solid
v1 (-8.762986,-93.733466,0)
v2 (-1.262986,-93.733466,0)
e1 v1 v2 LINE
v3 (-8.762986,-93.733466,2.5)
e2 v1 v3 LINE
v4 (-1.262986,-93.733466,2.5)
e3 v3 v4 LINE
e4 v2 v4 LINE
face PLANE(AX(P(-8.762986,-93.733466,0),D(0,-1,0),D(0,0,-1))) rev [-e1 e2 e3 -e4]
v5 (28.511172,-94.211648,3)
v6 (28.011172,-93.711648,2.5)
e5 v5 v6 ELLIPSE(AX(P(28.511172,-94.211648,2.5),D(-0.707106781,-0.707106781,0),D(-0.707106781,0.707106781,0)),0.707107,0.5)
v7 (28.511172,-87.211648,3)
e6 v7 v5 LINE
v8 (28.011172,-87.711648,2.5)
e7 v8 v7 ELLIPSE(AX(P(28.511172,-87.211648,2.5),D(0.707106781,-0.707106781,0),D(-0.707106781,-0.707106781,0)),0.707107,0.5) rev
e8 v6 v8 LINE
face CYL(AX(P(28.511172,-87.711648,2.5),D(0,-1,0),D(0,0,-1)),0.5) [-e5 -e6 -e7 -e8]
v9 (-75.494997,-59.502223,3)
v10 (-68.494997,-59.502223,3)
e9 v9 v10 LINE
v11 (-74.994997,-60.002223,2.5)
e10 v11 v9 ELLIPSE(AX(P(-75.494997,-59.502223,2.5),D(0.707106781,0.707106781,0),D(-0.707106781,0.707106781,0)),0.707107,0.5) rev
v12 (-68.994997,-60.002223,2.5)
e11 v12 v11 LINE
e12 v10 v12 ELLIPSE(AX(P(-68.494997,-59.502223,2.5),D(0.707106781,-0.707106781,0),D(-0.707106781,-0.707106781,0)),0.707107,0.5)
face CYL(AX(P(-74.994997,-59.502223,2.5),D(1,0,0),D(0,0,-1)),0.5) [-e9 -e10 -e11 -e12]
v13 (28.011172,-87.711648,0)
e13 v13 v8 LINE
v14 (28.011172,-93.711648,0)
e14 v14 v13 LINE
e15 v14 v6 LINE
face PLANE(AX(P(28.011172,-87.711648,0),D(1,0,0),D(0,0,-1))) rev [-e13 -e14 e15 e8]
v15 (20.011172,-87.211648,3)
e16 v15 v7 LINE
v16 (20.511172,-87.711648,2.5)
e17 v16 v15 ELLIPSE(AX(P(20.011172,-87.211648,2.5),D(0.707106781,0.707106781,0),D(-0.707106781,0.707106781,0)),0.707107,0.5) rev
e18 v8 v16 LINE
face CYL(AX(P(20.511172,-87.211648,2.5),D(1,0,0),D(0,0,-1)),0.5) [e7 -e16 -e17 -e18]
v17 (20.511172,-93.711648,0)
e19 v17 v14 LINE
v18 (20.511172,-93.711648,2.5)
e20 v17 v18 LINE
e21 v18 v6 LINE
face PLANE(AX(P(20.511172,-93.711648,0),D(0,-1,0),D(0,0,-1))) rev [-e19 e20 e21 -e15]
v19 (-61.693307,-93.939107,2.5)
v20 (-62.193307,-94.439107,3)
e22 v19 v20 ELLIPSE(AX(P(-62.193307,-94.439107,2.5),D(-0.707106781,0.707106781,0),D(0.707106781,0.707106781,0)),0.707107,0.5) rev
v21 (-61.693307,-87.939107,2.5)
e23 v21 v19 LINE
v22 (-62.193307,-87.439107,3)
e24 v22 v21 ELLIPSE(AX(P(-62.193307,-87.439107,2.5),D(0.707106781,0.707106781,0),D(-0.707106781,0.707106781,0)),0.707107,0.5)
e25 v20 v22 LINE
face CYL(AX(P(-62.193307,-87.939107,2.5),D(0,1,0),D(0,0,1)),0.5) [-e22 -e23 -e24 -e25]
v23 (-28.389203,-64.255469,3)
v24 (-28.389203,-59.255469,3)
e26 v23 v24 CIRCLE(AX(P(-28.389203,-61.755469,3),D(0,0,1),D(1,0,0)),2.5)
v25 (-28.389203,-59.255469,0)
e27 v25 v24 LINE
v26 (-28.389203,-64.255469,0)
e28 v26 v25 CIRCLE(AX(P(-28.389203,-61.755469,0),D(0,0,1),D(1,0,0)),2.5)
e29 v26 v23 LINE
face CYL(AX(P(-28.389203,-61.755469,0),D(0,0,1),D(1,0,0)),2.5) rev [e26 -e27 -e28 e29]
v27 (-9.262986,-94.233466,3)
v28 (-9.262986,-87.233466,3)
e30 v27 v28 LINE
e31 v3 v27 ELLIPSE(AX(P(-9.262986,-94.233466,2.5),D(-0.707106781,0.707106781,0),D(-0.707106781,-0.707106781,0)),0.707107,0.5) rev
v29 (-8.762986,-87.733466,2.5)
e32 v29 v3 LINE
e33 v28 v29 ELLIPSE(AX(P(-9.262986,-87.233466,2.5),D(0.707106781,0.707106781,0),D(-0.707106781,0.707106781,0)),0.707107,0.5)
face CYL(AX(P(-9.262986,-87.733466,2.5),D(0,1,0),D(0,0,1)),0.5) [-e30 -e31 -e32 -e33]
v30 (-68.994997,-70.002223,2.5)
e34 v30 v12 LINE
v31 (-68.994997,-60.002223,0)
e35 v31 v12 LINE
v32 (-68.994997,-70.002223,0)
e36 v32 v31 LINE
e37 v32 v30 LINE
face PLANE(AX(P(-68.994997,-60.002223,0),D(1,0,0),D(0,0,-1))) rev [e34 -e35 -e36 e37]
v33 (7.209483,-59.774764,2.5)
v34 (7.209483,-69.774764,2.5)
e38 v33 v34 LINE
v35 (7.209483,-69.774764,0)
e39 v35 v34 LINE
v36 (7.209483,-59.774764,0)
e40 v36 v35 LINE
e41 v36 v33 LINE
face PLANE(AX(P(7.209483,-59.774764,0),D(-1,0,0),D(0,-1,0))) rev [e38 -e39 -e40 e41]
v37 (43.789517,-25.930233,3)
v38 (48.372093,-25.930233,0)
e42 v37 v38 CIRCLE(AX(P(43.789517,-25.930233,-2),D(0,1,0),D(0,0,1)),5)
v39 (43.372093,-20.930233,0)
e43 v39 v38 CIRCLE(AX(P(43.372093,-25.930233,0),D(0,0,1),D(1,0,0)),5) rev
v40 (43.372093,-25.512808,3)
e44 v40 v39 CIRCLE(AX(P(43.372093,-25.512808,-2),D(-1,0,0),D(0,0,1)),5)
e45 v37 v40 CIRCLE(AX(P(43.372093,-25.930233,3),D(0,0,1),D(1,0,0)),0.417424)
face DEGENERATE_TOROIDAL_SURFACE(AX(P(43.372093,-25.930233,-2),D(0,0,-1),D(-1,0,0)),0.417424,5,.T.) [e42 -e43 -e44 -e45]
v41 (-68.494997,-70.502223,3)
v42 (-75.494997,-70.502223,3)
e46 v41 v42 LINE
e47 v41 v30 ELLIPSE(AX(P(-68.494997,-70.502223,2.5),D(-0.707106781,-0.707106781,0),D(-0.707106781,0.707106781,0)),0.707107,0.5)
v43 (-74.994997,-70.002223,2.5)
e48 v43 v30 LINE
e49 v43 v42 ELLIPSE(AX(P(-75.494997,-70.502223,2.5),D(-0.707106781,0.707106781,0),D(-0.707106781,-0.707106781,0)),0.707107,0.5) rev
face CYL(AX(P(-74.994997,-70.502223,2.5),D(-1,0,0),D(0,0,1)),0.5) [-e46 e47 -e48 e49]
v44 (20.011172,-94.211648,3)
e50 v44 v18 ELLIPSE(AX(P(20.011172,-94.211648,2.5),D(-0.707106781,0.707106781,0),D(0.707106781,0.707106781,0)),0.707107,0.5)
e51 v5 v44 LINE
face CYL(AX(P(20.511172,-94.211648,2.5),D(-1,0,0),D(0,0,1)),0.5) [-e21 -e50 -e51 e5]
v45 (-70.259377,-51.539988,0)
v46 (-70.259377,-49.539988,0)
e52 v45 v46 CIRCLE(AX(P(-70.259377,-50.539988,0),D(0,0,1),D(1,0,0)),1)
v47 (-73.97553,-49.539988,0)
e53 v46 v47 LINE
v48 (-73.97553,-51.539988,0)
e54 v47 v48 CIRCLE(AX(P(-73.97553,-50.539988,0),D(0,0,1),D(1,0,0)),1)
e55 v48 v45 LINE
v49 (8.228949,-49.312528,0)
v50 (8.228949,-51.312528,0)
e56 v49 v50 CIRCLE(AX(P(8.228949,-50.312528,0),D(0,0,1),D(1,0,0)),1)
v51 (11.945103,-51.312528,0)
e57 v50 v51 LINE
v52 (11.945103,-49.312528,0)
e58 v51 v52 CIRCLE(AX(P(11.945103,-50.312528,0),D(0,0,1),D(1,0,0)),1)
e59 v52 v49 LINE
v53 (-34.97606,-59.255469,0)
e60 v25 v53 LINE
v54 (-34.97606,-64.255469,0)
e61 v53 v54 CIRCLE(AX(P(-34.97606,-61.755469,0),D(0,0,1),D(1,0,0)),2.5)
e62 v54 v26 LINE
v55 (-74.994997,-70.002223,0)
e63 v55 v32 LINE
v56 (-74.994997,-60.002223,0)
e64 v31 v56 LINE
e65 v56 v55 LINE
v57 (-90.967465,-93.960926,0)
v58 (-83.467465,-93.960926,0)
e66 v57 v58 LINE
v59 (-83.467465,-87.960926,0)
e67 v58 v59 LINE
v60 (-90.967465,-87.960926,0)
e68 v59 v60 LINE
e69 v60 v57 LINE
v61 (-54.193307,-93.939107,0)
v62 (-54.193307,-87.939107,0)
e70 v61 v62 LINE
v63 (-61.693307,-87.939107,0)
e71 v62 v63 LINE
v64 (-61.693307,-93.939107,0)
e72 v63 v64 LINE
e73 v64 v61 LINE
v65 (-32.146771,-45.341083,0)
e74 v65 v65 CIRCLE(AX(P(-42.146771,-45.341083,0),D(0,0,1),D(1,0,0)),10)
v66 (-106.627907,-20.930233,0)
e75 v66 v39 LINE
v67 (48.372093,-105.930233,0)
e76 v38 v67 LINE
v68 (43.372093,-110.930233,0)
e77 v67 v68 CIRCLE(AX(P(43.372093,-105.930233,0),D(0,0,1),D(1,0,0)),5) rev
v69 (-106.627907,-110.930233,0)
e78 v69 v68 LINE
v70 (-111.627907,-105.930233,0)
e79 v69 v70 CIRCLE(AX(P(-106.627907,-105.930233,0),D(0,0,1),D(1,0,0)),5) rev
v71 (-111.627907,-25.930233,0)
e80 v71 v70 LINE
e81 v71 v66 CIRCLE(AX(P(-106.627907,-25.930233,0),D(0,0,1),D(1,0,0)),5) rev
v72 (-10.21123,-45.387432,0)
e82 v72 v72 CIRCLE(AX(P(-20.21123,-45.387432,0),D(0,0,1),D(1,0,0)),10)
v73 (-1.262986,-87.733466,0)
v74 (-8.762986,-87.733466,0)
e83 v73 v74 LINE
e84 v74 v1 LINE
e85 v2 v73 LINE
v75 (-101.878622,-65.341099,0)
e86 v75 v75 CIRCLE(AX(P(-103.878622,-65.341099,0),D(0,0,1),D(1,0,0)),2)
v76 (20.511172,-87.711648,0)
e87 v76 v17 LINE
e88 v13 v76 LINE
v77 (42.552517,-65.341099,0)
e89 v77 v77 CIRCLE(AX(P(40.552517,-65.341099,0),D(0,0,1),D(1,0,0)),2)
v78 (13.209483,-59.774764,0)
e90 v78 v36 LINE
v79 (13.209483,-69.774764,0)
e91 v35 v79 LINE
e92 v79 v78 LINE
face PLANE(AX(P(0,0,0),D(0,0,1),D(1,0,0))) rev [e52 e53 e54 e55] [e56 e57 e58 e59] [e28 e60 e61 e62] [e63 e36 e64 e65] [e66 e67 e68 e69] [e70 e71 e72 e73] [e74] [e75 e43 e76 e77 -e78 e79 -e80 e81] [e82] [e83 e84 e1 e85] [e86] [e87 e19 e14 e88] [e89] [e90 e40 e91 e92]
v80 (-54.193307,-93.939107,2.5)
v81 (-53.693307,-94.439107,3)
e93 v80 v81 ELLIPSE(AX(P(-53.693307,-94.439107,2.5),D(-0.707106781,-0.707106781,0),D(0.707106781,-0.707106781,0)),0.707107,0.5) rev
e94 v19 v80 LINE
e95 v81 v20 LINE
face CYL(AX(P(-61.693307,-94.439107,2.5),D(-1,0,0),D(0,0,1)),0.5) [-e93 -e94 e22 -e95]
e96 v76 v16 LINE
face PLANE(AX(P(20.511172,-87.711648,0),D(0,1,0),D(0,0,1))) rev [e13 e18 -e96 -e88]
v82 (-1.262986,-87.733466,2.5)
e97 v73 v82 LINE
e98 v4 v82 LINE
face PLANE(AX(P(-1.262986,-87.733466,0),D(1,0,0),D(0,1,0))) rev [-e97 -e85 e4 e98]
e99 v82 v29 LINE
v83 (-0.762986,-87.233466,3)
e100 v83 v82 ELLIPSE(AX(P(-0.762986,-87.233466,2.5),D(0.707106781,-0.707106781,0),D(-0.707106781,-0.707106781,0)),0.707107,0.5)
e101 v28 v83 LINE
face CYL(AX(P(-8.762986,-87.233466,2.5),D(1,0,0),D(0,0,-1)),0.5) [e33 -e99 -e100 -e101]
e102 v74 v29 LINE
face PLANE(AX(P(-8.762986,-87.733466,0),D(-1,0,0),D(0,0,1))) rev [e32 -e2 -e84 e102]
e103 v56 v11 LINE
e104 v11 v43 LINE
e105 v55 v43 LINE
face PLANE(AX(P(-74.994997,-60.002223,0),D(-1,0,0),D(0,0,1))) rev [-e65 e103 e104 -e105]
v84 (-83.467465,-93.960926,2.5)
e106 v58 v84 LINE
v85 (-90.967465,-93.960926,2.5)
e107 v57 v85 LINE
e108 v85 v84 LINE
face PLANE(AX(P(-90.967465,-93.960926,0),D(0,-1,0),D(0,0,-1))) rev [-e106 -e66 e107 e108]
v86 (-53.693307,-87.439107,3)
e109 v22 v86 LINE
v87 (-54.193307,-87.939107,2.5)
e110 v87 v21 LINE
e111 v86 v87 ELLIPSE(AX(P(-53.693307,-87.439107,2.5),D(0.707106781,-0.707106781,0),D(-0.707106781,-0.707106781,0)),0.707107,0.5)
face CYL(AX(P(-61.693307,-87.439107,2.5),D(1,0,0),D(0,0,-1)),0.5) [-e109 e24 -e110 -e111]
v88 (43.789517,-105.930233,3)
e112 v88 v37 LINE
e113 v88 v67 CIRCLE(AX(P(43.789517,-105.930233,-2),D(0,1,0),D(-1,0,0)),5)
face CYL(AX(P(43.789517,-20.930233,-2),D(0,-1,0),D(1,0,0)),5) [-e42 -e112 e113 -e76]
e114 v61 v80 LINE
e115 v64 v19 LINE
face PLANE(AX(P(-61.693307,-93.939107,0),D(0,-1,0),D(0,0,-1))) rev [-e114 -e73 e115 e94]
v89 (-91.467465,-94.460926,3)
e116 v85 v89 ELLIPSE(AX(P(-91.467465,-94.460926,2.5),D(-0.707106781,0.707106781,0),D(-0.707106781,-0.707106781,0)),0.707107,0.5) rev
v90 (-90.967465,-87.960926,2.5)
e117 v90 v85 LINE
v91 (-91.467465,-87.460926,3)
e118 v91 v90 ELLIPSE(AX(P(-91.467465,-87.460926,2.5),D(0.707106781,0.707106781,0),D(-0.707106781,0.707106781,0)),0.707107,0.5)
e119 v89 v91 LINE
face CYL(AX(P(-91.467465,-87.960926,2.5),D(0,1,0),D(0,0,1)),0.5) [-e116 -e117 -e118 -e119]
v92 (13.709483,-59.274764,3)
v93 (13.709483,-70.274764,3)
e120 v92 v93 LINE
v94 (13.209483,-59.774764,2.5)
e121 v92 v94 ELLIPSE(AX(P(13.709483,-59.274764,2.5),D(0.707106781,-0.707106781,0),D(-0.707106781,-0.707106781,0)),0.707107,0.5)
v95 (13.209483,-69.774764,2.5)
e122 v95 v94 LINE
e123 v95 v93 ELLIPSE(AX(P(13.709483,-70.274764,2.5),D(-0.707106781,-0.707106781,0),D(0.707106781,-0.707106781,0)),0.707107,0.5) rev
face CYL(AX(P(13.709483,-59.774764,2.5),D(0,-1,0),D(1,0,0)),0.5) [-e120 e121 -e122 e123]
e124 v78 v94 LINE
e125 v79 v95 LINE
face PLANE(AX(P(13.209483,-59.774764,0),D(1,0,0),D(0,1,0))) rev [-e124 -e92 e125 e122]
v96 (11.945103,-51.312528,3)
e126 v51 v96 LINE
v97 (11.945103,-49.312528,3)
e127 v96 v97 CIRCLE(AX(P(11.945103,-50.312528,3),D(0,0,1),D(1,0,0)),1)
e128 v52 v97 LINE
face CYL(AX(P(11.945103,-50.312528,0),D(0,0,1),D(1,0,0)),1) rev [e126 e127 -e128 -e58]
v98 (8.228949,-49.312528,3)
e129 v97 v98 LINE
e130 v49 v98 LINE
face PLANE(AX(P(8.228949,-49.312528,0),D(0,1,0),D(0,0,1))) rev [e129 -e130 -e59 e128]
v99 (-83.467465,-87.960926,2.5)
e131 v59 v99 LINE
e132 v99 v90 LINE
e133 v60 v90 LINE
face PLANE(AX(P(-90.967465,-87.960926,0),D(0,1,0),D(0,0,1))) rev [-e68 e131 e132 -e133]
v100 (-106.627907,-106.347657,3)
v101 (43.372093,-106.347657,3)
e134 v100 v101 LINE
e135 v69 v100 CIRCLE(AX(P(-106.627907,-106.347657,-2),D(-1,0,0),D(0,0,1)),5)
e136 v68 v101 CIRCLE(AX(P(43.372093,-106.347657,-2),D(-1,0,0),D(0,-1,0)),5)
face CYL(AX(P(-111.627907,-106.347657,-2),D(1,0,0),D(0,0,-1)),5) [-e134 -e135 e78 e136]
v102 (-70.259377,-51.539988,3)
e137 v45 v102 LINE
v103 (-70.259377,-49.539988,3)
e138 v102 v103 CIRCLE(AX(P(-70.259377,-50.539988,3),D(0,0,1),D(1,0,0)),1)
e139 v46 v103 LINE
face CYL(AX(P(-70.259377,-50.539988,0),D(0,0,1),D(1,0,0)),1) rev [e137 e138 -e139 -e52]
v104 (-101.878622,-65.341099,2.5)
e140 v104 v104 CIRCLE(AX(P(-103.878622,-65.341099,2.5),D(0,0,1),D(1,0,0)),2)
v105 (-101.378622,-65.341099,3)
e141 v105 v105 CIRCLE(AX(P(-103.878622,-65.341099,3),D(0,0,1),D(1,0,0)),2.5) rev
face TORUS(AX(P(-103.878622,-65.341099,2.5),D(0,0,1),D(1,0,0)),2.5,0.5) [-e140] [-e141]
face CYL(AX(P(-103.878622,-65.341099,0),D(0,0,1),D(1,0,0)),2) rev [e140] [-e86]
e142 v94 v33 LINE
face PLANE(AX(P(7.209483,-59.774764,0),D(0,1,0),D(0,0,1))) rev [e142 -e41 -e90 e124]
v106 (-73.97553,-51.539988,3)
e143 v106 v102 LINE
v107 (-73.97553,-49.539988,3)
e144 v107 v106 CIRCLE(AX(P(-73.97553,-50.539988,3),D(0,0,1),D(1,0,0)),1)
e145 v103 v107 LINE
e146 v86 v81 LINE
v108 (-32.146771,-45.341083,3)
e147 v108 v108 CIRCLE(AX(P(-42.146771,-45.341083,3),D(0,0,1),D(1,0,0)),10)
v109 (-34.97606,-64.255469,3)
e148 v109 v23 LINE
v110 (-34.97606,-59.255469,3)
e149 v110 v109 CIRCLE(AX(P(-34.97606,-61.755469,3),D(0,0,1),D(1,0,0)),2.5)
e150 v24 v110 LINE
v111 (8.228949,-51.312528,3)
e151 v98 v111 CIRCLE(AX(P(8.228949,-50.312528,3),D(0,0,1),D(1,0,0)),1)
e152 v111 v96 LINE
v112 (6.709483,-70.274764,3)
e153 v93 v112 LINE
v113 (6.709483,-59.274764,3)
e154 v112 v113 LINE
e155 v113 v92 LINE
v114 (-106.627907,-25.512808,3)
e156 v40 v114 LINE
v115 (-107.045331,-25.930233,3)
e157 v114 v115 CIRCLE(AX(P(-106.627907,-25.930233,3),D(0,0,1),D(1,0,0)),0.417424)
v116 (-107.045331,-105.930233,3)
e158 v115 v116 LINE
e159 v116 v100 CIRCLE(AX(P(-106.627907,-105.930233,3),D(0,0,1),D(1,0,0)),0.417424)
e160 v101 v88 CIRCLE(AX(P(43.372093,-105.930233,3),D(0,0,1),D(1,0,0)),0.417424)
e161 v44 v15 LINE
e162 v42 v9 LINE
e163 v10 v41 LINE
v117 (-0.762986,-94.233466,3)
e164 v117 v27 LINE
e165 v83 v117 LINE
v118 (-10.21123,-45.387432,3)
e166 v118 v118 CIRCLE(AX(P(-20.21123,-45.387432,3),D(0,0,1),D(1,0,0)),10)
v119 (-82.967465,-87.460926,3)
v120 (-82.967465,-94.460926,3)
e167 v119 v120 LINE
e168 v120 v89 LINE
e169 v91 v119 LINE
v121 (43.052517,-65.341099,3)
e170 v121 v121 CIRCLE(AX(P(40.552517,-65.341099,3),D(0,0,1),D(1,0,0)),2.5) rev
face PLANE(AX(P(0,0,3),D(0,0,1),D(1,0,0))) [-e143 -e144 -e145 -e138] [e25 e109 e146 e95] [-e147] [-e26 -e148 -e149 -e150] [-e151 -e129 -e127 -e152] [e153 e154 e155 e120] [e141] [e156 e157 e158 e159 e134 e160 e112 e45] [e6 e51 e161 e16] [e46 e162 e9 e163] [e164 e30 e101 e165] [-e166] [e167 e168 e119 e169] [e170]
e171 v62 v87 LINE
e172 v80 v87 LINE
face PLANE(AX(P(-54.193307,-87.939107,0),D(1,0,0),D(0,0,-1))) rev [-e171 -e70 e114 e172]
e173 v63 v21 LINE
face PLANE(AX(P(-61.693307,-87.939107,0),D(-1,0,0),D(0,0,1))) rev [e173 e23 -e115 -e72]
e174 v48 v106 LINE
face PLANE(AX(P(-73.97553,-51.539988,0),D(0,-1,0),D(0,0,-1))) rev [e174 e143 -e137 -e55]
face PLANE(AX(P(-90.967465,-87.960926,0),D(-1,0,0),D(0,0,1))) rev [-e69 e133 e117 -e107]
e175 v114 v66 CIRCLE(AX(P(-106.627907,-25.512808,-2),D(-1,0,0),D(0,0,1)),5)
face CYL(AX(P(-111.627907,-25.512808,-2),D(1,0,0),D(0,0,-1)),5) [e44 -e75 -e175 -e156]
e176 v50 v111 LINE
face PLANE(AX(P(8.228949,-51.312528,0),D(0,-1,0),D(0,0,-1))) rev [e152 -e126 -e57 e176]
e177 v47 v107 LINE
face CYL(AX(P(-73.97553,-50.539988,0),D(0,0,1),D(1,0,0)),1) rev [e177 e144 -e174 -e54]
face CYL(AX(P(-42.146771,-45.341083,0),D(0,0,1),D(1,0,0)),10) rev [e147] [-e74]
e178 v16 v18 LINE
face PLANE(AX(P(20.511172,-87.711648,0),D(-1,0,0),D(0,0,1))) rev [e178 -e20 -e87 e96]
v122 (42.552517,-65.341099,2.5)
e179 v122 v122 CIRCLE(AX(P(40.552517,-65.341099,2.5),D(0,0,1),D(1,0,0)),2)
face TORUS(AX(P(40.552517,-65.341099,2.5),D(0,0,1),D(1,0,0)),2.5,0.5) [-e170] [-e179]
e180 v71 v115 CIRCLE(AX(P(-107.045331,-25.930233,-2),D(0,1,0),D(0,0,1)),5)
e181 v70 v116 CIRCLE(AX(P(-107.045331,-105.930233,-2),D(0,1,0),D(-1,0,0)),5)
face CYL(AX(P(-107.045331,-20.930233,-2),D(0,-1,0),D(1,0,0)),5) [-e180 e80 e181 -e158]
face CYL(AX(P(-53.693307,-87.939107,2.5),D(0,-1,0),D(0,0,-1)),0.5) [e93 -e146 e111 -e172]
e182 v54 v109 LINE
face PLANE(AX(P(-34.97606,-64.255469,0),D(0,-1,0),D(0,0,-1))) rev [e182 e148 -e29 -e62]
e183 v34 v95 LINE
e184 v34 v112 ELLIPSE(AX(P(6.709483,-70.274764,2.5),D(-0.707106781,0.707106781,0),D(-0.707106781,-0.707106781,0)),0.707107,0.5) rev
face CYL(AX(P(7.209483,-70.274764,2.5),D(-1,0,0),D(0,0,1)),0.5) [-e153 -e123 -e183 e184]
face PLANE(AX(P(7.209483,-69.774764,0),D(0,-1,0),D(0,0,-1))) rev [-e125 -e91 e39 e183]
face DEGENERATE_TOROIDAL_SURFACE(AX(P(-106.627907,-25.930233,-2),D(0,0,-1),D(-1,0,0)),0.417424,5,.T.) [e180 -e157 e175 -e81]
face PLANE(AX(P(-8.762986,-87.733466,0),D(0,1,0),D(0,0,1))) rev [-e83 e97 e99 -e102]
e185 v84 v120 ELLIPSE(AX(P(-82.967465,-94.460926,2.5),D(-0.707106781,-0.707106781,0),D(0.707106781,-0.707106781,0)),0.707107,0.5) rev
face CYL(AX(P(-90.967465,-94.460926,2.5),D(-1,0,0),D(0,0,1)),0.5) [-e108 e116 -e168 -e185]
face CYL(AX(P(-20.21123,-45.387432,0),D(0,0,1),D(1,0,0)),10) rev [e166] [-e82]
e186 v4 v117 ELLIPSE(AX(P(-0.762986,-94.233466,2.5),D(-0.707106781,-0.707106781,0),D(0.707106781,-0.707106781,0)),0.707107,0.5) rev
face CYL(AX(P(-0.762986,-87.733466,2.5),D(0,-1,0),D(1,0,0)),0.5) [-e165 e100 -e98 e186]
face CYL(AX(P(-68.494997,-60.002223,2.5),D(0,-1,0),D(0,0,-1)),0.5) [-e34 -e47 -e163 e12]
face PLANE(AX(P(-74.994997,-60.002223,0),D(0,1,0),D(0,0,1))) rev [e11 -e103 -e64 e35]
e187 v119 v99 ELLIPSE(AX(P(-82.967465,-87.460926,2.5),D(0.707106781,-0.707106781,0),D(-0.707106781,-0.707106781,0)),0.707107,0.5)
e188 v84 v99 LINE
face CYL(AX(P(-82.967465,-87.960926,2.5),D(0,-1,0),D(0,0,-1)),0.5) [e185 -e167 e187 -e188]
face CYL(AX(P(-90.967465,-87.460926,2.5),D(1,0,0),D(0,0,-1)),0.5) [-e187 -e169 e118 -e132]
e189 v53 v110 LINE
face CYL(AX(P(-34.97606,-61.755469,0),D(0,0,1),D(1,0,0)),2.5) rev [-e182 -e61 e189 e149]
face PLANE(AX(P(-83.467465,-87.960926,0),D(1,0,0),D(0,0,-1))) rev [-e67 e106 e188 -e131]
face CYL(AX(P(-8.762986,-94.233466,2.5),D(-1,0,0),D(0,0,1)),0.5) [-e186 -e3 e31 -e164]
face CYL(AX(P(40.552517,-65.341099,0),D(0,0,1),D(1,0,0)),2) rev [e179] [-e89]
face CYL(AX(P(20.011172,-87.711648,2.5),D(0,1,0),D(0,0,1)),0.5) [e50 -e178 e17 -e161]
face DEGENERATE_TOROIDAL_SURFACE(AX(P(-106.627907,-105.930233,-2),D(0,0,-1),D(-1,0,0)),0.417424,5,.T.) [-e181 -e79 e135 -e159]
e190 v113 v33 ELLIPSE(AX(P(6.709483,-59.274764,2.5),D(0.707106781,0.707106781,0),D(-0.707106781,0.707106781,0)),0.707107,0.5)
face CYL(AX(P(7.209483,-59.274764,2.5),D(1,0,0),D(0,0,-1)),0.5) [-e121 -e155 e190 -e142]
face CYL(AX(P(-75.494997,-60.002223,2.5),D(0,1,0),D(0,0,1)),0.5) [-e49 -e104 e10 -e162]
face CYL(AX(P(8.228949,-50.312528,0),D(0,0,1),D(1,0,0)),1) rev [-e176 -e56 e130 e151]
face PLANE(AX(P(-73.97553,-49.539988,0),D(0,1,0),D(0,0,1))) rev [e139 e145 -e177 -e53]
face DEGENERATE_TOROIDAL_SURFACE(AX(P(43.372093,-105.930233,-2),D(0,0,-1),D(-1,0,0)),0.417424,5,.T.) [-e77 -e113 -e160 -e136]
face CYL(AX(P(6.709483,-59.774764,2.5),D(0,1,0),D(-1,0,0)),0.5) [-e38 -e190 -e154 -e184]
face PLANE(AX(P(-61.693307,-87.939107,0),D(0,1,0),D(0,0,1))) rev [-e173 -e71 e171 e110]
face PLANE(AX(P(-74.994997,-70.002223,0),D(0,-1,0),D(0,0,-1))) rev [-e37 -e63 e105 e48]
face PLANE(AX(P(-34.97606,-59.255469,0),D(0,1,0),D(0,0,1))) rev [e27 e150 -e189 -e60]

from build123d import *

# Parameters (mm, degrees)
SKETCH1_W           = 160
SKETCH1_H           = 90
BOSS_EXTRUDE8_DEPTH = 3
FILLET15_R          = 5
FILLET16_R          = 5
SKETCH14_R          = 10
SKETCH14_R_2        = 2
SKETCH14_W          = 7.5
SKETCH14_H          = 6
SKETCH14_W_2        = 6
SKETCH14_H_2        = 10
CUT_EXTRUDE1_DEPTH  = 3
FILLET17_R          = 0.5


with BuildPart() as part:
    # Sketch1 → Boss-Extrude8 (new body)
    with BuildSketch(Plane.XY):
        with Locations((-31.627906977, -65.930232558)):
            Rectangle(SKETCH1_W, SKETCH1_H)
    extrude(amount=BOSS_EXTRUDE8_DEPTH)

    # Fillet15
    fillet15_edges = [part.edges().sort_by_distance(p)[0] for p in [
        (-111.627906977, -20.930232558, 1.5),
        (48.372093023, -20.930232558, 1.5),
        (48.372093023, -110.930232558, 1.5),
        (-111.627906977, -110.930232558, 1.5),
    ]]
    fillet(fillet15_edges, radius=FILLET15_R)

    # Fillet16
    # the kernel refuses this fillet: 5 mm, written as the material it takes off along each edge
    with BuildSketch(Plane(origin=(-106.627906977, -25.930232558, 3), x_dir=(0, 1, 0), z_dir=(1, 0, 0))) as fillet16_piece_1:
        with BuildLine():
            CenterArc((0.417424305, -5), FILLET16_R, 23.578178478, 66.421821522)
            Line((0.417424305, 0), (0.417424305, 0.1))
            Line((0.417424305, 0.1), (5, 0.1))
            Line((5, 0.1), (5.1, 0))
            ThreePointArc((5.1, 0), (5.1, -1.5), (5.091651514, -2.96))
            Line((5.091651514, -2.96), (5, -3))
        make_face()
    revolve(axis=Axis((-106.627906977, -25.930232558, 3), (0, 0, 1)), revolution_arc=90, mode=Mode.SUBTRACT)
    with BuildSketch(Plane(origin=(-106.627906977, -20.930232558, 3), x_dir=(0, 0, -1), z_dir=(1, 0, 0))) as fillet16_piece_2:
        with BuildLine():
            CenterArc((5, -4.582575695), FILLET16_R, 113.578178478, 66.421821522)
            Line((0, -4.582575695), (-0.1, -4.582575695))
            Line((-0.1, -4.582575695), (-0.1, 0))
            Line((-0.1, 0), (0, 0.1))
            ThreePointArc((0, 0.1), (1.5, 0.1), (2.96, 0.091651514))
            Line((2.96, 0.091651514), (3, 0))
        make_face()
    extrude(amount=150, mode=Mode.SUBTRACT)
    with BuildSketch(Plane(origin=(43.372093023, -25.930232558, 3), x_dir=(0, 1, 0), z_dir=(-1, 0, 0))) as fillet16_piece_3:
        with BuildLine():
            CenterArc((0.417424305, 5), FILLET16_R, 270, 66.421821522)
            Line((0.417424305, 0), (0.417424305, -0.1))
            Line((0.417424305, -0.1), (5, -0.1))
            Line((5, -0.1), (5.1, 0))
            ThreePointArc((5.1, 0), (5.1, 1.5), (5.091651514, 2.96))
            Line((5.091651514, 2.96), (5, 3))
        make_face()
    revolve(axis=Axis((43.372093023, -25.930232558, 3), (0, 0, -1)), revolution_arc=90, mode=Mode.SUBTRACT)
    with BuildSketch(Plane(origin=(48.372093023, -25.930232558, 3), x_dir=(-1, 0, 0), z_dir=(0, -1, 0)), Plane(origin=(-111.627906977, -105.930232558, 3), x_dir=(1, 0, 0), z_dir=(0, 1, 0))) as fillet16_piece_4:
        with BuildLine():
            CenterArc((4.582575695, 5), FILLET16_R, 203.578178478, 66.421821522)
            Line((0, 3), (-0.091651514, 2.96))
            ThreePointArc((-0.091651514, 2.96), (-0.1, 1.5), (-0.1, 0))
            Line((-0.1, 0), (0, -0.1))
            Line((0, -0.1), (4.582575695, -0.1))
            Line((4.582575695, -0.1), (4.582575695, 0))
        make_face()
    extrude(amount=80, mode=Mode.SUBTRACT)
    with BuildSketch(Plane(origin=(43.372093023, -105.930232558, 3), x_dir=(1, 0, 0), z_dir=(0, 1, 0))) as fillet16_piece_5:
        with BuildLine():
            CenterArc((0.417424305, 5), FILLET16_R, 270, 66.421821522)
            Line((5, 3), (5.091651514, 2.96))
            ThreePointArc((5.091651514, 2.96), (5.1, 1.5), (5.1, 0))
            Line((5.1, 0), (5, -0.1))
            Line((5, -0.1), (0.417424305, -0.1))
            Line((0.417424305, -0.1), (0.417424305, 0))
        make_face()
    revolve(axis=Axis((43.372093023, -105.930232558, 3), (0, 0, -1)), revolution_arc=90, mode=Mode.SUBTRACT)
    with BuildSketch(Plane(origin=(43.372093023, -110.930232558, 3), x_dir=(0, 1, 0), z_dir=(-1, 0, 0))) as fillet16_piece_6:
        with BuildLine():
            CenterArc((4.582575695, 5), FILLET16_R, 203.578178478, 66.421821522)
            Line((0, 3), (-0.091651514, 2.96))
            ThreePointArc((-0.091651514, 2.96), (-0.1, 1.5), (-0.1, 0))
            Line((-0.1, 0), (0, -0.1))
            Line((0, -0.1), (4.582575695, -0.1))
            Line((4.582575695, -0.1), (4.582575695, 0))
        make_face()
    extrude(amount=150, mode=Mode.SUBTRACT)
    with BuildSketch(Plane(origin=(-106.627906977, -105.930232558, 3), x_dir=(0, -1, 0), z_dir=(1, 0, 0))) as fillet16_piece_7:
        with BuildLine():
            CenterArc((0.417424305, 5), FILLET16_R, 270, 66.421821522)
            Line((5, 3), (5.091651514, 2.96))
            ThreePointArc((5.091651514, 2.96), (5.1, 1.5), (5.1, 0))
            Line((5.1, 0), (5, -0.1))
            Line((5, -0.1), (0.417424305, -0.1))
            Line((0.417424305, -0.1), (0.417424305, 0))
        make_face()
    revolve(axis=Axis((-106.627906977, -105.930232558, 3), (0, 0, -1)), revolution_arc=90, mode=Mode.SUBTRACT)

    # Sketch14 → Cut-Extrude1 (cut)
    with BuildSketch(Plane.XY.offset(3)):
        with Locations((-42.146770789, -45.341082591)):
            Circle(SKETCH14_R)
        with Locations((-103.87862187, -65.341099016)):
            Circle(SKETCH14_R_2)
        with Locations((40.552517345, -65.341099016)):
            Circle(SKETCH14_R_2)
        with Locations((-20.211230278, -45.387431922)):
            Circle(SKETCH14_R)
        with Locations((-57.943307222, -90.939107411)):
            Rectangle(SKETCH14_W, SKETCH14_H)
        with Locations((-71.994996652, -65.002222921)):
            Rectangle(SKETCH14_W_2, SKETCH14_H_2)
        with Locations((-87.217465232, -90.960925791)):
            Rectangle(SKETCH14_W, SKETCH14_H)
        with BuildLine():
            Line((-73.975530372, -49.539987585), (-70.259376522, -49.539987585))
            ThreePointArc((-70.259376522, -49.539987585), (-69.259376522, -50.539987585), (-70.259376522, -51.539987585))
            Line((-70.259376522, -51.539987585), (-73.975530372, -51.539987585))
            ThreePointArc((-73.975530372, -51.539987585), (-74.975530372, -50.539987585), (-73.975530372, -49.539987585))
        make_face()
        with Locations((24.261172399, -90.711648075)):
            Rectangle(SKETCH14_W, SKETCH14_H)
        with Locations((10.209482969, -64.774763585)):
            Rectangle(SKETCH14_W_2, SKETCH14_H_2)
        with Locations((-5.012985611, -90.733466455)):
            Rectangle(SKETCH14_W, SKETCH14_H)
        with BuildLine():
            Line((8.228949249, -49.312528249), (11.945103099, -49.312528249))
            ThreePointArc((11.945103099, -49.312528249), (12.945103099, -50.312528249), (11.945103099, -51.312528249))
            Line((11.945103099, -51.312528249), (8.228949249, -51.312528249))
            ThreePointArc((8.228949249, -51.312528249), (7.228949249, -50.312528249), (8.228949249, -49.312528249))
        make_face()
        with BuildLine():
            Line((-34.976059895, -59.255469081), (-28.389202639, -59.255469081))
            ThreePointArc((-28.389202639, -59.255469081), (-25.889202639, -61.755469081), (-28.389202639, -64.255469081))
            Line((-28.389202639, -64.255469081), (-34.976059895, -64.255469081))
            ThreePointArc((-34.976059895, -64.255469081), (-37.476059895, -61.755469081), (-34.976059895, -59.255469081))
        make_face()
    extrude(amount=-CUT_EXTRUDE1_DEPTH, mode=Mode.SUBTRACT)

    # Fillet17
    fillet17_edges = [part.edges().sort_by_distance(p)[0] for p in [
        (20.511172399, -90.711648075, 3),
        (24.261172399, -93.711648075, 3),
        (28.011172399, -90.711648075, 3),
        (24.261172399, -87.711648075, 3),
        (-8.762985611, -90.733466455, 3),
        (-5.012985611, -93.733466455, 3),
        (-1.262985611, -90.733466455, 3),
        (-5.012985611, -87.733466455, 3),
        (7.209482969, -64.774763585, 3),
        (10.209482969, -69.774763585, 3),
        (13.209482969, -64.774763585, 3),
        (10.209482969, -59.774763585, 3),
        (-61.693307222, -90.939107411, 3),
        (-57.943307222, -93.939107411, 3),
        (-54.193307222, -90.939107411, 3),
        (-57.943307222, -87.939107411, 3),
        (-90.967465232, -90.960925791, 3),
        (-87.217465232, -93.960925791, 3),
        (-83.467465232, -90.960925791, 3),
        (-87.217465232, -87.960925791, 3),
        (38.552517345, -65.341099016, 3),
        (-105.87862187, -65.341099016, 3),
        (-74.994996652, -65.002222921, 3),
        (-71.994996652, -70.002222921, 3),
        (-68.994996652, -65.002222921, 3),
        (-71.994996652, -60.002222921, 3),
    ]]
    fillet(fillet17_edges, radius=FILLET17_R)


solid = part.part
